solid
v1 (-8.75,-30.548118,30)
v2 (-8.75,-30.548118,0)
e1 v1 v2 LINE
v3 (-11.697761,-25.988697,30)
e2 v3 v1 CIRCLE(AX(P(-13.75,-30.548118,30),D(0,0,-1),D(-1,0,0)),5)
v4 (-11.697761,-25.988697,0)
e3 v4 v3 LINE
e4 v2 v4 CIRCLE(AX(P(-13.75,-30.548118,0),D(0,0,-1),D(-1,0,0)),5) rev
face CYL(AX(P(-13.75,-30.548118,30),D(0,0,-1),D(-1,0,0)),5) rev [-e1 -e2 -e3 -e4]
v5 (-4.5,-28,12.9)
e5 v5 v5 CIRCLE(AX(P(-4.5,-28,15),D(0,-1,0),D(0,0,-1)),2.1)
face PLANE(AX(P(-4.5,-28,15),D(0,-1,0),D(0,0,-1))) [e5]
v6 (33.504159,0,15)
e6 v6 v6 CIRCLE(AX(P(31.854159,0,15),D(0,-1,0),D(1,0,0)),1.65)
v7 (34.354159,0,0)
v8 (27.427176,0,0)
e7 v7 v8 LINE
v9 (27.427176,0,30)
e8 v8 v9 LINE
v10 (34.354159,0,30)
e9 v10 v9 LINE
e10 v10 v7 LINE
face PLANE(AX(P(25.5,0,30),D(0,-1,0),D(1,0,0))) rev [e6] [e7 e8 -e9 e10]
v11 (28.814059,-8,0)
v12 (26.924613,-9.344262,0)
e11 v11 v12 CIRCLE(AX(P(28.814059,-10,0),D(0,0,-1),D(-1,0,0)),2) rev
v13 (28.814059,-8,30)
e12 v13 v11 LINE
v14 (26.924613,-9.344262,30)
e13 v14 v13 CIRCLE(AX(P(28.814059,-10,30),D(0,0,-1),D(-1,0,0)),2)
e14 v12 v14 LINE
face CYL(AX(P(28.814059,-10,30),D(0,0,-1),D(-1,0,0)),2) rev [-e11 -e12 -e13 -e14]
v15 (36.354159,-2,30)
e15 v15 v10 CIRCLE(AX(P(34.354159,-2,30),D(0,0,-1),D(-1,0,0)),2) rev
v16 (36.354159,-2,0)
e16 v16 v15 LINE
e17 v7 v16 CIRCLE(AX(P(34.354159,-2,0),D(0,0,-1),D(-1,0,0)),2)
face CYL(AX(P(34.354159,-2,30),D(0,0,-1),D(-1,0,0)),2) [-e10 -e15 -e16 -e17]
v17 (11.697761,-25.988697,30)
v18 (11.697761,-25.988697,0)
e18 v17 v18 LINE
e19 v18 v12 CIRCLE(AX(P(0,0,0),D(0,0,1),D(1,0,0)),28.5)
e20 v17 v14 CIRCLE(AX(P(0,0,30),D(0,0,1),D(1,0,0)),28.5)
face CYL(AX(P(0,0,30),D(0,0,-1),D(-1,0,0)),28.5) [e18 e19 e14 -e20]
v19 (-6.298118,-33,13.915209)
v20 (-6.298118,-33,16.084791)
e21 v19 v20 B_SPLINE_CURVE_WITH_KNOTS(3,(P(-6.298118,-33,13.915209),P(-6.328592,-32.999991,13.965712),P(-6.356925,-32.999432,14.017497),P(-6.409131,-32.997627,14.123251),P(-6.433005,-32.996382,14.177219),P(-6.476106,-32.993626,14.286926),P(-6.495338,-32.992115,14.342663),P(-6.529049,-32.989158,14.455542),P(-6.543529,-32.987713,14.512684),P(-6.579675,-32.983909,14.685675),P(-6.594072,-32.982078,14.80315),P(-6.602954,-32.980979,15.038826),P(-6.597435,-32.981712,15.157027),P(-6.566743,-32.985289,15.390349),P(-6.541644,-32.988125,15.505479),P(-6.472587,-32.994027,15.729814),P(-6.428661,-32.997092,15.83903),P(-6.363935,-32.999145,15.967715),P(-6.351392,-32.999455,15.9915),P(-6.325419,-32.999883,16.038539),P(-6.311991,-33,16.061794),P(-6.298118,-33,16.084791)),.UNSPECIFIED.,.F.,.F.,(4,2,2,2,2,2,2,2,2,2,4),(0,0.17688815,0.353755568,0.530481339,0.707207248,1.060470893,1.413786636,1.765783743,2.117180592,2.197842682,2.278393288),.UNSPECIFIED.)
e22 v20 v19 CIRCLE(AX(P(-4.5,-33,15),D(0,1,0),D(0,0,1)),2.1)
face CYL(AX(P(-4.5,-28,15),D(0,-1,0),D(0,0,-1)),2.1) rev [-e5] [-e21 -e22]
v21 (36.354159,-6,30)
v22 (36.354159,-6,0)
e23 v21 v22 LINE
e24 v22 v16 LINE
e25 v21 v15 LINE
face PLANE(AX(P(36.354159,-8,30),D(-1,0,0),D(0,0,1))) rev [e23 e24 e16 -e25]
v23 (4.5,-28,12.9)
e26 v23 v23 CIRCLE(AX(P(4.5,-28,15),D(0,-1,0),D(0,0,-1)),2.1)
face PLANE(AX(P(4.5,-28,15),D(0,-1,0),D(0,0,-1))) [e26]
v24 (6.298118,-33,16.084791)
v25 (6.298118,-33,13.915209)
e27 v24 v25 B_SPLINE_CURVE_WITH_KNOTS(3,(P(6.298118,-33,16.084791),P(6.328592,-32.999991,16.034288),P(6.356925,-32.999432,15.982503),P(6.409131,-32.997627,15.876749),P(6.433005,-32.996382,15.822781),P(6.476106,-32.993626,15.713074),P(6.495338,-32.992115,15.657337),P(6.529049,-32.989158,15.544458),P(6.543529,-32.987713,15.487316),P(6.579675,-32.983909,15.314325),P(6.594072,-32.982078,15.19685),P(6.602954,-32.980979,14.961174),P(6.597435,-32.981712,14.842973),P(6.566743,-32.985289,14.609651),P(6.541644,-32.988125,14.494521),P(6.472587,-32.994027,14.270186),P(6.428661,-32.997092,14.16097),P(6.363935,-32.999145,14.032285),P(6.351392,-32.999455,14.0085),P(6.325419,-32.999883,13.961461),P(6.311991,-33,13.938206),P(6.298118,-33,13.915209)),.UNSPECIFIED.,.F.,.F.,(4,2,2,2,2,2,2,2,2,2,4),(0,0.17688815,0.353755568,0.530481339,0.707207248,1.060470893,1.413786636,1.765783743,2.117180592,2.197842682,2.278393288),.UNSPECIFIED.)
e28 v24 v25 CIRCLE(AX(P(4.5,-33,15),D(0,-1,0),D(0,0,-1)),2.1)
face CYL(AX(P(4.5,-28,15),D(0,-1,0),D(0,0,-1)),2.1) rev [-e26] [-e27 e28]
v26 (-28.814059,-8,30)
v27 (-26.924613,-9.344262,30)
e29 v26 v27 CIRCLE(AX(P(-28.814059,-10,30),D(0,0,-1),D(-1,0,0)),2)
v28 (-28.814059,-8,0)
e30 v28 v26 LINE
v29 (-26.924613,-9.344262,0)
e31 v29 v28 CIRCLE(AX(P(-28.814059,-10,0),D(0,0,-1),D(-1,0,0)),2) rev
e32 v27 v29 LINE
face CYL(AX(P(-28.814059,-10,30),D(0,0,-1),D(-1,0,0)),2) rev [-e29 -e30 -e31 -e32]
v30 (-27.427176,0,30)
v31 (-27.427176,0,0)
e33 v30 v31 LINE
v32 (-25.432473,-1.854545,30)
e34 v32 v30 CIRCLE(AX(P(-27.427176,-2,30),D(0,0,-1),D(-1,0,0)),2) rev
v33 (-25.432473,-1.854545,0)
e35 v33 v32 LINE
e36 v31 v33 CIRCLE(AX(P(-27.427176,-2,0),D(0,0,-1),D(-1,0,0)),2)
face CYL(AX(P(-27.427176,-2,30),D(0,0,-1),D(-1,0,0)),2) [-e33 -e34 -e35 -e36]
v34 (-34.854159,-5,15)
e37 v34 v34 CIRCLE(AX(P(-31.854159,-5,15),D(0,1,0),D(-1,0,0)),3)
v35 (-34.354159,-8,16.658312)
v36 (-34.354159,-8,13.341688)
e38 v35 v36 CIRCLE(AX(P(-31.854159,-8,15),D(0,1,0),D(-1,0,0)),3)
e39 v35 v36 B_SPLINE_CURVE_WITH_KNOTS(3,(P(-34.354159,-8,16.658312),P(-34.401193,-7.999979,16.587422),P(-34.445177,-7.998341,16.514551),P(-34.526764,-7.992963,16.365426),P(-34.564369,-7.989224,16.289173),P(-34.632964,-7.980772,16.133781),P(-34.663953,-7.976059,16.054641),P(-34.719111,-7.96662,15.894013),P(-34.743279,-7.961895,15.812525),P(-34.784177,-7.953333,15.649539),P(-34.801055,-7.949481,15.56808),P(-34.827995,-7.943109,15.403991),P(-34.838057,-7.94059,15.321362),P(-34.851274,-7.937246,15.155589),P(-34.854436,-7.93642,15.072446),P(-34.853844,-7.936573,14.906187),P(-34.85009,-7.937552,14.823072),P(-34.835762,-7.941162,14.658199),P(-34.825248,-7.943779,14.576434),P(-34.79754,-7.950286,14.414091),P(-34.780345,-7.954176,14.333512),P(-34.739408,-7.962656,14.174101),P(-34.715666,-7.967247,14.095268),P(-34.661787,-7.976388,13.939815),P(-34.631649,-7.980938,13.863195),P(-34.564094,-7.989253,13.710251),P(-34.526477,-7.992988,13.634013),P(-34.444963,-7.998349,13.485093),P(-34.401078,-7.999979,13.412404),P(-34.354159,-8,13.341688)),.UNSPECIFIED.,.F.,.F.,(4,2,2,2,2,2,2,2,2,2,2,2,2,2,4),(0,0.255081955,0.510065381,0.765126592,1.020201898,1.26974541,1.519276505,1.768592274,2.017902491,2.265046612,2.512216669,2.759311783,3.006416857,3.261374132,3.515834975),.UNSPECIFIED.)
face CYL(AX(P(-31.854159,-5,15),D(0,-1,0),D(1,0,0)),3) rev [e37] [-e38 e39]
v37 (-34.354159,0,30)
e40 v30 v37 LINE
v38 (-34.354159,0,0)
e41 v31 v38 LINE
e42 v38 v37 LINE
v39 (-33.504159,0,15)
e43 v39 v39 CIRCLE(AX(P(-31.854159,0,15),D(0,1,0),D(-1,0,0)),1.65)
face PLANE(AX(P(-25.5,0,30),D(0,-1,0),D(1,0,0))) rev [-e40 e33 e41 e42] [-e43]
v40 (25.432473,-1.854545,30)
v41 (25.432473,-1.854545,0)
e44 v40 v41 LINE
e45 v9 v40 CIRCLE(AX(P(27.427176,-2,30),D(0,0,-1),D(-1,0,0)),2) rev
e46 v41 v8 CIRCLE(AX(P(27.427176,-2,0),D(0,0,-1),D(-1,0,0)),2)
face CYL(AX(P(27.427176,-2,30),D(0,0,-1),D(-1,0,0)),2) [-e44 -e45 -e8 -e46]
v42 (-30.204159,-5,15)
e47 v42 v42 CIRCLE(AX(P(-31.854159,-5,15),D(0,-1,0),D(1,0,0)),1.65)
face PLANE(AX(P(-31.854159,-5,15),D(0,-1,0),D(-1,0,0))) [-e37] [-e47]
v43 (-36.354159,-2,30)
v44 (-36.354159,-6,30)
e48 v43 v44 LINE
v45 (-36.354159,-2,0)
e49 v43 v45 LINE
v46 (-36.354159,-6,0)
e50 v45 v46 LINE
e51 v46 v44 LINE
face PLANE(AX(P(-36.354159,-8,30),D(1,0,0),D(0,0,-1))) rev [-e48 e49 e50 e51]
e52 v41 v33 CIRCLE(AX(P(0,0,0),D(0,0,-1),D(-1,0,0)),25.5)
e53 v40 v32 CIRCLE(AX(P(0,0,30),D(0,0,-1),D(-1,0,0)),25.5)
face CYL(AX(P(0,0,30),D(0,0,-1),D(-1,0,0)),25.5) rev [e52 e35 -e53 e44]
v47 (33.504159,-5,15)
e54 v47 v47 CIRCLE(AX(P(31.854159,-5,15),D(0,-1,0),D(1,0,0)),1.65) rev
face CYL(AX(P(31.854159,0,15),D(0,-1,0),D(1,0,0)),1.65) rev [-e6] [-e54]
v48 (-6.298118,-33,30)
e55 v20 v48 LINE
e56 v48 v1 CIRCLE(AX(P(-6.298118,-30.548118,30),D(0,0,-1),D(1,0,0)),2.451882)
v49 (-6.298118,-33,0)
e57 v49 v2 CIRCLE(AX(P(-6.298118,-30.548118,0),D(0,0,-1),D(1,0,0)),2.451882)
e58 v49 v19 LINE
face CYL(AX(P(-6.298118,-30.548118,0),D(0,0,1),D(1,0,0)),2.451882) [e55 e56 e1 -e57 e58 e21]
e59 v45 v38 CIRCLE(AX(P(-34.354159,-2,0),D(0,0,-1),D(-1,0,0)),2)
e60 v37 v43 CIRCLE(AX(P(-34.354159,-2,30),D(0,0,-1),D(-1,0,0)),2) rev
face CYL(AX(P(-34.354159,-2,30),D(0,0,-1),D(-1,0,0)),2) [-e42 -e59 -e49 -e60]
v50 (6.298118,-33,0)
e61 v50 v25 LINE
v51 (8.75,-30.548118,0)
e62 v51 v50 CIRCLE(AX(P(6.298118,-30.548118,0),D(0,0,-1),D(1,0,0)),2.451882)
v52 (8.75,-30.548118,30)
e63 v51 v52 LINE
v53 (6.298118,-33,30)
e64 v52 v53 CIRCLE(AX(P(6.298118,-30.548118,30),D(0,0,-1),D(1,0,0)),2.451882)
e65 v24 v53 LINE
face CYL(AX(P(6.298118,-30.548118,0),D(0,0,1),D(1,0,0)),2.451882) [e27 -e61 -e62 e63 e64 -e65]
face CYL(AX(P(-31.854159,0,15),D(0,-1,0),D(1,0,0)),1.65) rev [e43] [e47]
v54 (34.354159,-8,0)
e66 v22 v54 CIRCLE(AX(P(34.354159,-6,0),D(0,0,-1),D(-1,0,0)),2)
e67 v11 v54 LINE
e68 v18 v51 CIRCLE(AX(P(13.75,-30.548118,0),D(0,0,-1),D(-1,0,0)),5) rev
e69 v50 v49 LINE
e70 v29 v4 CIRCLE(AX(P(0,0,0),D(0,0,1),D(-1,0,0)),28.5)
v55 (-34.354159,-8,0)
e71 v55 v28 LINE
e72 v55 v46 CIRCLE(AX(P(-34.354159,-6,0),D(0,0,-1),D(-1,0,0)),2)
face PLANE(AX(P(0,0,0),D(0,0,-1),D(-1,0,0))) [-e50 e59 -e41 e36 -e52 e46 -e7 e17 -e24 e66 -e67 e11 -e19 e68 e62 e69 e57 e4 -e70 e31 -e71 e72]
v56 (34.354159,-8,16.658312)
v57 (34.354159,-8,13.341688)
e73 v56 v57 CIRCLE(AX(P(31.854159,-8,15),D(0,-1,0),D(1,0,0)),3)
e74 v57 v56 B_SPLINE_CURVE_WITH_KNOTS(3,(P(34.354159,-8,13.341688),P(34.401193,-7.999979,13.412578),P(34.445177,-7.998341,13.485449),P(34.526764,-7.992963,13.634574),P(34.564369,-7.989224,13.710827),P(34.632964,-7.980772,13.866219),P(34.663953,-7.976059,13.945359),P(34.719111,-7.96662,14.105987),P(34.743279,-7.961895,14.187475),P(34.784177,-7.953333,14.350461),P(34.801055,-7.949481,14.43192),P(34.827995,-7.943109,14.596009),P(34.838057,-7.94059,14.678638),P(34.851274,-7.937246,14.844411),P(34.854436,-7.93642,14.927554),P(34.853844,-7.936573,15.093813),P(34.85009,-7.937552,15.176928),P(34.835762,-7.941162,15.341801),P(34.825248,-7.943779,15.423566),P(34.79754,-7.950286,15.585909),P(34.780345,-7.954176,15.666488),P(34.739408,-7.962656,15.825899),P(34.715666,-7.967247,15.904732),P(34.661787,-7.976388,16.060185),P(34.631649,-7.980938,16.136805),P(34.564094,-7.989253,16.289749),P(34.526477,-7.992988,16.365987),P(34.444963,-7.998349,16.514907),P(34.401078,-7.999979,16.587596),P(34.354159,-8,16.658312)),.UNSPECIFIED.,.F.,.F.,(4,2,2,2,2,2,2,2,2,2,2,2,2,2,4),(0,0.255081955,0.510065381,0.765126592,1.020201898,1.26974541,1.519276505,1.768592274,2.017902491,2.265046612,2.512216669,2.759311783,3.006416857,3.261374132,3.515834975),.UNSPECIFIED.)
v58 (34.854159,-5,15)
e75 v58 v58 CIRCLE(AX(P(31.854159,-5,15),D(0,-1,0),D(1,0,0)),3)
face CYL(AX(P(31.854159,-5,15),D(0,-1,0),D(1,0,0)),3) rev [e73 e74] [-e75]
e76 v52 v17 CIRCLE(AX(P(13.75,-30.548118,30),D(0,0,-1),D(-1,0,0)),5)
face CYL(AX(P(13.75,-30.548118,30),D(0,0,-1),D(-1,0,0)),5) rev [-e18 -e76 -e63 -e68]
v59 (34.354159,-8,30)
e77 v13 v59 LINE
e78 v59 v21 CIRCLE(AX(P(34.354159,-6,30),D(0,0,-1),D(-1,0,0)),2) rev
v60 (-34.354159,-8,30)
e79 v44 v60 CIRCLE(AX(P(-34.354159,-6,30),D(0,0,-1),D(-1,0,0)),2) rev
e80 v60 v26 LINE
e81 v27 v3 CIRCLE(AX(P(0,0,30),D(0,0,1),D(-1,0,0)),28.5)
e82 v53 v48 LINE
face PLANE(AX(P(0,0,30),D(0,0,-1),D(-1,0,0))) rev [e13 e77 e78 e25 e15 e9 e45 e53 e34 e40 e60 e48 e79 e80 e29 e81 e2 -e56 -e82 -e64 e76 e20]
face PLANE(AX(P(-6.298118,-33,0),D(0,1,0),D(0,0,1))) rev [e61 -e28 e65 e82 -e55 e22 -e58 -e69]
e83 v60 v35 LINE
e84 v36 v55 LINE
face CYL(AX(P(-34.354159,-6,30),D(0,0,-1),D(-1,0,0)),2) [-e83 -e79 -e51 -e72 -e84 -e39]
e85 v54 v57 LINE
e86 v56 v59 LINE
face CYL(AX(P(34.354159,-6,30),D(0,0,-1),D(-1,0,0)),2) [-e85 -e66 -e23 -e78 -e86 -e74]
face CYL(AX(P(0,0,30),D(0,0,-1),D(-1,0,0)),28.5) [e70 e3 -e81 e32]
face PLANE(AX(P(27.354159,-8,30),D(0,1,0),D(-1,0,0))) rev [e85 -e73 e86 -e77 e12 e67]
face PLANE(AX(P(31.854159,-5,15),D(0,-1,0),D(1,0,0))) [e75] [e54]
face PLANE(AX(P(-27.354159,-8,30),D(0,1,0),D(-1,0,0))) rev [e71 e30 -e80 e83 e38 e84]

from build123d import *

# Parameters (mm, degrees)
SKETCH3_R           = 8.05
BOSS_EXTRUDE1_DEPTH = 30
SKETCH4_R           = 8.05
SKETCH4_R_2         = 4.3
BOSS_EXTRUDE2_DEPTH = 25
CHAMFER1_SIZE       = 3
FILLET1_R           = 11
SKETCH5_R           = 1.65
CUT_EXTRUDE1_DEPTH  = 81.777378375
SKETCH6_R           = 3
CUT_EXTRUDE2_DEPTH  = 3
SKETCH7_W           = 22
SKETCH7_H           = 18.6
CUT_EXTRUDE3_DEPTH  = 88.398998033
FILLET2_R           = 2
SKETCH8_R           = 1.65
CUT_EXTRUDE4_DEPTH  = 73.43358938
CUT_EXTRUDE5_DEPTH  = 73.43358938
FILLET3_R           = 5
SKETCH10_R          = 3
CUT_EXTRUDE6_DEPTH  = 3
CUT_EXTRUDE7_DEPTH  = 73.43358938
SKETCH12_R          = 2.1
CUT_EXTRUDE8_DEPTH  = 5


# Some blends are built 0.0001 mm under size
with BuildPart() as part:
    # Sketch3 → Boss-Extrude1 (new body)
    with BuildSketch(Plane.XY):
        with BuildLine():
            Line((-25.5, 0), (-36.354158733, 0))
            Line((-36.354158733, 0), (-36.354158733, -8))
            Line((-36.354158733, -8), (-27.354158733, -8))
            ThreePointArc((-27.354158733, -8), (-21.246325292, -18.995885385), (-11, -26.29163365))
            Line((-11, -26.29163365), (-11, -73.6))
            Line((-11, -73.6), (11, -73.6))
            Line((11, -73.6), (11, -26.29163365))
            ThreePointArc((11, -26.29163365), (21.246325292, -18.995885385), (27.354158733, -8))
            Line((27.354158733, -8), (36.354158733, -8))
            Line((36.354158733, -8), (36.354158733, 0))
            Line((36.354158733, 0), (25.5, 0))
            ThreePointArc((25.5, 0), (0, -25.5), (-25.5, 0))
        make_face()
        with Locations((0, -62.6)):
            Circle(SKETCH3_R, mode=Mode.SUBTRACT)
    extrude(amount=BOSS_EXTRUDE1_DEPTH)

    # Sketch4 → Boss-Extrude2 (add)
    with BuildSketch(Plane.XY):
        with Locations(Location((0, -62.6, 0), (0, 0, 180))):
            Circle(SKETCH4_R)
        with Locations(Location((0, -62.6, 0), (0, 0, 180))):
            Circle(SKETCH4_R_2, mode=Mode.SUBTRACT)
    extrude(amount=BOSS_EXTRUDE2_DEPTH)

    # Chamfer1
    chamfer1_edges = [part.edges().sort_by_distance(p)[0] for p in [
        (0, -73.6, 0),
    ]]
    chamfer(chamfer1_edges, length=CHAMFER1_SIZE)

    # Fillet1
    fillet1_edges = [part.edges().sort_by_distance(p)[0] for p in [
        (-11, -73.6, 16.5),
        (11, -73.6, 16.5),
    ]]
    fillet(fillet1_edges, radius=FILLET1_R - 0.0001)  # a hair under: the kernel refuses the full size

    # Sketch5 → Cut-Extrude1 (cut, through all)
    with BuildSketch(Plane.XZ.offset(8)):
        with Locations((31.854158733, 15)):
            Circle(SKETCH5_R)
    cut_extrude1 = extrude(amount=-CUT_EXTRUDE1_DEPTH, mode=Mode.SUBTRACT)

    # Sketch6 → Cut-Extrude2 (cut)
    with BuildSketch(Plane.XZ.offset(8)):
        with Locations((31.854158733, 15)):
            Circle(SKETCH6_R)
    cut_extrude2 = extrude(amount=-CUT_EXTRUDE2_DEPTH, mode=Mode.SUBTRACT)

    # Mirror1: Cut-Extrude1, Cut-Extrude2 across plane
    add(cut_extrude1.mirror(Plane(origin=(0, 0, 0), x_dir=(0, 0, 1), z_dir=(1, 0, 0))), mode=Mode.SUBTRACT)
    add(cut_extrude2.mirror(Plane(origin=(0, 0, 0), x_dir=(0, 0, 1), z_dir=(1, 0, 0))), mode=Mode.SUBTRACT)

    # Sketch7 → Cut-Extrude3 (cut, through all)
    with BuildSketch(Plane.XY.offset(30)):
        with Locations((0, -64.3)):
            Rectangle(SKETCH7_W, SKETCH7_H)
    extrude(amount=-CUT_EXTRUDE3_DEPTH, mode=Mode.SUBTRACT)

    # Fillet2
    # the kernel refuses this fillet: 2 mm, written as the material it adds along each edge
    with BuildSketch(Plane(origin=(27.354158733, -8, 0), x_dir=(1, 0, 0), z_dir=(0, 0, 1))) as fillet2_piece_1:
        with BuildLine():
            CenterArc((1.459900335, -2), FILLET2_R, 90, 70.860525549)
            ThreePointArc((-0.429546161, -1.344262295), (-0.206451392, -0.674790264), (0, 0))
            Line((0, 0), (1.459900335, 0))
        make_face()
    extrude(amount=30)
    with BuildSketch(Plane(origin=(-27.354158733, -8, 0), x_dir=(0.30437860573795156, -0.9525511347791366, 0), z_dir=(0, 0, 1))) as fillet2_piece_2:
        with BuildLine():
            CenterArc((1.460739841, -1.999386932), FILLET2_R, 91.418691197, 70.860525549)
            Line((-0.444362429, -1.390629721), (0, 0))
            ThreePointArc((0, 0), (0.705611618, -0.008736212), (1.411223236, 0))
        make_face()
    extrude(amount=30)
    # the kernel refuses this fillet: 2 mm, written as the material it takes off along each edge
    with BuildSketch(Plane(origin=(-36.354158733, 0, -5), x_dir=(0, -1, 0), z_dir=(0, 0, 1)), Plane(origin=(36.354158733, 0, -5), x_dir=(-1, 0, 0), z_dir=(0, 0, 1)), Plane(origin=(36.354158733, -8, -5), x_dir=(0, 1, 0), z_dir=(0, 0, 1)), Plane(origin=(-36.354158733, -8, -5), x_dir=(1, 0, 0), z_dir=(0, 0, 1))) as fillet2_2_piece_1:
        with BuildLine():
            CenterArc((FILLET2_R, FILLET2_R), FILLET2_R, 180, 90)
            Line((0, FILLET2_R), (0, 0))
            Line((0, 0), (FILLET2_R, 0))
        make_face()
    extrude(amount=40, mode=Mode.SUBTRACT)
    with BuildSketch(Plane(origin=(-25.5, 0, -4.81794076), x_dir=(-1, 0, 0), z_dir=(0, 0, 1))) as fillet2_2_piece_2:
        with BuildLine():
            CenterArc((1.927176304, 2), FILLET2_R, 184.170647912, 85.829352088)
            ThreePointArc((-0.067527427, 1.854545455), (-0.016887449, 0.927887223), (0, 0))
            Line((0, 0), (1.927176304, 0))
        make_face()
    extrude(amount=39.635881519, mode=Mode.SUBTRACT)
    with BuildSketch(Plane(origin=(25.5, 0, -4.81794076), x_dir=(-0.03638773424584517, -0.9993377471087809, 0), z_dir=(0, 0, 1))) as fillet2_2_piece_3:
        with BuildLine():
            CenterArc((1.928549915, 1.998675494), FILLET2_R, 182.085323956, 85.829352088)
            Line((-0.070125579, 1.925900026), (0, 0))
            ThreePointArc((0, 0), (0.927887223, 0.016887449), (1.855774447, 0))
        make_face()
    extrude(amount=39.635881519, mode=Mode.SUBTRACT)

    # Sketch8 → Cut-Extrude4 (cut, through all)
    with BuildSketch(Plane.XY.offset(30)):
        with Locations((4.5, -49)):
            Circle(SKETCH8_R)
        with Locations((-4.5, -49)):
            Circle(SKETCH8_R)
    extrude(amount=-CUT_EXTRUDE4_DEPTH, mode=Mode.SUBTRACT)

    # Sketch9 → Cut-Extrude5 (cut, through all)
    with BuildSketch(Plane.XY.offset(30)):
        with BuildLine():
            Line((-8.75, -55), (-8.75, -27.12355987))
            ThreePointArc((-8.75, -27.12355987), (-9.883756892, -26.73128036), (-11, -26.29163365))
            Line((-11, -26.29163365), (-11, -55))
            Line((-11, -55), (-8.75, -55))
        make_face()
        with BuildLine():
            Line((8.75, -55), (8.75, -27.12355987))
            ThreePointArc((8.75, -27.12355987), (9.883756892, -26.73128036), (11, -26.29163365))
            Line((11, -26.29163365), (11, -55))
            Line((11, -55), (8.75, -55))
        make_face()
    extrude(amount=-CUT_EXTRUDE5_DEPTH, mode=Mode.SUBTRACT)

    # Fillet3
    fillet3_edges = [part.edges().sort_by_distance(p)[0] for p in [
        (-8.75, -55, 15),
        (-8.75, -27.12355987, 15),
        (8.75, -55, 15),
        (8.75, -27.12355987, 15),
    ]]
    fillet(fillet3_edges, radius=FILLET3_R)

    # Sketch10 → Cut-Extrude6 (cut)
    with BuildSketch(Plane.XY.offset(30)):
        with Locations((4.5, -49)):
            Circle(SKETCH10_R)
        with Locations((-4.5, -49)):
            Circle(SKETCH10_R)
    extrude(amount=-CUT_EXTRUDE6_DEPTH, mode=Mode.SUBTRACT)

    # Sketch11 → Cut-Extrude7 (cut, through all)
    with BuildSketch(Plane.XY.offset(30)):
        with BuildLine():
            Line((8.75, -30.548117782), (8.75, -50))
            ThreePointArc((8.75, -50), (7.285533906, -53.535533906), (3.75, -55))
            Line((3.75, -55), (-3.75, -55))
            ThreePointArc((-3.75, -55), (-7.285533906, -53.535533906), (-8.75, -50))
            Line((-8.75, -50), (-8.75, -30.548117782))
            ThreePointArc((-8.75, -30.548117782), (-8.031860325, -32.281860325), (-6.298117782, -33))
            Line((-6.298117782, -33), (6.298117782, -33))
            ThreePointArc((6.298117782, -33), (8.031860325, -32.281860325), (8.75, -30.548117782))
        make_face()
    extrude(amount=-CUT_EXTRUDE7_DEPTH, mode=Mode.SUBTRACT)

    # Sketch12 → Cut-Extrude8 (cut)
    with BuildSketch(Plane.XZ.offset(33)):
        with Locations(Location((-4.5, 15, 0), (0, 0, 270))):
            Circle(SKETCH12_R)
        with Locations(Location((4.5, 15, 0), (0, 0, 270))):
            Circle(SKETCH12_R)
    extrude(amount=-CUT_EXTRUDE8_DEPTH, mode=Mode.SUBTRACT)


solid = part.part
